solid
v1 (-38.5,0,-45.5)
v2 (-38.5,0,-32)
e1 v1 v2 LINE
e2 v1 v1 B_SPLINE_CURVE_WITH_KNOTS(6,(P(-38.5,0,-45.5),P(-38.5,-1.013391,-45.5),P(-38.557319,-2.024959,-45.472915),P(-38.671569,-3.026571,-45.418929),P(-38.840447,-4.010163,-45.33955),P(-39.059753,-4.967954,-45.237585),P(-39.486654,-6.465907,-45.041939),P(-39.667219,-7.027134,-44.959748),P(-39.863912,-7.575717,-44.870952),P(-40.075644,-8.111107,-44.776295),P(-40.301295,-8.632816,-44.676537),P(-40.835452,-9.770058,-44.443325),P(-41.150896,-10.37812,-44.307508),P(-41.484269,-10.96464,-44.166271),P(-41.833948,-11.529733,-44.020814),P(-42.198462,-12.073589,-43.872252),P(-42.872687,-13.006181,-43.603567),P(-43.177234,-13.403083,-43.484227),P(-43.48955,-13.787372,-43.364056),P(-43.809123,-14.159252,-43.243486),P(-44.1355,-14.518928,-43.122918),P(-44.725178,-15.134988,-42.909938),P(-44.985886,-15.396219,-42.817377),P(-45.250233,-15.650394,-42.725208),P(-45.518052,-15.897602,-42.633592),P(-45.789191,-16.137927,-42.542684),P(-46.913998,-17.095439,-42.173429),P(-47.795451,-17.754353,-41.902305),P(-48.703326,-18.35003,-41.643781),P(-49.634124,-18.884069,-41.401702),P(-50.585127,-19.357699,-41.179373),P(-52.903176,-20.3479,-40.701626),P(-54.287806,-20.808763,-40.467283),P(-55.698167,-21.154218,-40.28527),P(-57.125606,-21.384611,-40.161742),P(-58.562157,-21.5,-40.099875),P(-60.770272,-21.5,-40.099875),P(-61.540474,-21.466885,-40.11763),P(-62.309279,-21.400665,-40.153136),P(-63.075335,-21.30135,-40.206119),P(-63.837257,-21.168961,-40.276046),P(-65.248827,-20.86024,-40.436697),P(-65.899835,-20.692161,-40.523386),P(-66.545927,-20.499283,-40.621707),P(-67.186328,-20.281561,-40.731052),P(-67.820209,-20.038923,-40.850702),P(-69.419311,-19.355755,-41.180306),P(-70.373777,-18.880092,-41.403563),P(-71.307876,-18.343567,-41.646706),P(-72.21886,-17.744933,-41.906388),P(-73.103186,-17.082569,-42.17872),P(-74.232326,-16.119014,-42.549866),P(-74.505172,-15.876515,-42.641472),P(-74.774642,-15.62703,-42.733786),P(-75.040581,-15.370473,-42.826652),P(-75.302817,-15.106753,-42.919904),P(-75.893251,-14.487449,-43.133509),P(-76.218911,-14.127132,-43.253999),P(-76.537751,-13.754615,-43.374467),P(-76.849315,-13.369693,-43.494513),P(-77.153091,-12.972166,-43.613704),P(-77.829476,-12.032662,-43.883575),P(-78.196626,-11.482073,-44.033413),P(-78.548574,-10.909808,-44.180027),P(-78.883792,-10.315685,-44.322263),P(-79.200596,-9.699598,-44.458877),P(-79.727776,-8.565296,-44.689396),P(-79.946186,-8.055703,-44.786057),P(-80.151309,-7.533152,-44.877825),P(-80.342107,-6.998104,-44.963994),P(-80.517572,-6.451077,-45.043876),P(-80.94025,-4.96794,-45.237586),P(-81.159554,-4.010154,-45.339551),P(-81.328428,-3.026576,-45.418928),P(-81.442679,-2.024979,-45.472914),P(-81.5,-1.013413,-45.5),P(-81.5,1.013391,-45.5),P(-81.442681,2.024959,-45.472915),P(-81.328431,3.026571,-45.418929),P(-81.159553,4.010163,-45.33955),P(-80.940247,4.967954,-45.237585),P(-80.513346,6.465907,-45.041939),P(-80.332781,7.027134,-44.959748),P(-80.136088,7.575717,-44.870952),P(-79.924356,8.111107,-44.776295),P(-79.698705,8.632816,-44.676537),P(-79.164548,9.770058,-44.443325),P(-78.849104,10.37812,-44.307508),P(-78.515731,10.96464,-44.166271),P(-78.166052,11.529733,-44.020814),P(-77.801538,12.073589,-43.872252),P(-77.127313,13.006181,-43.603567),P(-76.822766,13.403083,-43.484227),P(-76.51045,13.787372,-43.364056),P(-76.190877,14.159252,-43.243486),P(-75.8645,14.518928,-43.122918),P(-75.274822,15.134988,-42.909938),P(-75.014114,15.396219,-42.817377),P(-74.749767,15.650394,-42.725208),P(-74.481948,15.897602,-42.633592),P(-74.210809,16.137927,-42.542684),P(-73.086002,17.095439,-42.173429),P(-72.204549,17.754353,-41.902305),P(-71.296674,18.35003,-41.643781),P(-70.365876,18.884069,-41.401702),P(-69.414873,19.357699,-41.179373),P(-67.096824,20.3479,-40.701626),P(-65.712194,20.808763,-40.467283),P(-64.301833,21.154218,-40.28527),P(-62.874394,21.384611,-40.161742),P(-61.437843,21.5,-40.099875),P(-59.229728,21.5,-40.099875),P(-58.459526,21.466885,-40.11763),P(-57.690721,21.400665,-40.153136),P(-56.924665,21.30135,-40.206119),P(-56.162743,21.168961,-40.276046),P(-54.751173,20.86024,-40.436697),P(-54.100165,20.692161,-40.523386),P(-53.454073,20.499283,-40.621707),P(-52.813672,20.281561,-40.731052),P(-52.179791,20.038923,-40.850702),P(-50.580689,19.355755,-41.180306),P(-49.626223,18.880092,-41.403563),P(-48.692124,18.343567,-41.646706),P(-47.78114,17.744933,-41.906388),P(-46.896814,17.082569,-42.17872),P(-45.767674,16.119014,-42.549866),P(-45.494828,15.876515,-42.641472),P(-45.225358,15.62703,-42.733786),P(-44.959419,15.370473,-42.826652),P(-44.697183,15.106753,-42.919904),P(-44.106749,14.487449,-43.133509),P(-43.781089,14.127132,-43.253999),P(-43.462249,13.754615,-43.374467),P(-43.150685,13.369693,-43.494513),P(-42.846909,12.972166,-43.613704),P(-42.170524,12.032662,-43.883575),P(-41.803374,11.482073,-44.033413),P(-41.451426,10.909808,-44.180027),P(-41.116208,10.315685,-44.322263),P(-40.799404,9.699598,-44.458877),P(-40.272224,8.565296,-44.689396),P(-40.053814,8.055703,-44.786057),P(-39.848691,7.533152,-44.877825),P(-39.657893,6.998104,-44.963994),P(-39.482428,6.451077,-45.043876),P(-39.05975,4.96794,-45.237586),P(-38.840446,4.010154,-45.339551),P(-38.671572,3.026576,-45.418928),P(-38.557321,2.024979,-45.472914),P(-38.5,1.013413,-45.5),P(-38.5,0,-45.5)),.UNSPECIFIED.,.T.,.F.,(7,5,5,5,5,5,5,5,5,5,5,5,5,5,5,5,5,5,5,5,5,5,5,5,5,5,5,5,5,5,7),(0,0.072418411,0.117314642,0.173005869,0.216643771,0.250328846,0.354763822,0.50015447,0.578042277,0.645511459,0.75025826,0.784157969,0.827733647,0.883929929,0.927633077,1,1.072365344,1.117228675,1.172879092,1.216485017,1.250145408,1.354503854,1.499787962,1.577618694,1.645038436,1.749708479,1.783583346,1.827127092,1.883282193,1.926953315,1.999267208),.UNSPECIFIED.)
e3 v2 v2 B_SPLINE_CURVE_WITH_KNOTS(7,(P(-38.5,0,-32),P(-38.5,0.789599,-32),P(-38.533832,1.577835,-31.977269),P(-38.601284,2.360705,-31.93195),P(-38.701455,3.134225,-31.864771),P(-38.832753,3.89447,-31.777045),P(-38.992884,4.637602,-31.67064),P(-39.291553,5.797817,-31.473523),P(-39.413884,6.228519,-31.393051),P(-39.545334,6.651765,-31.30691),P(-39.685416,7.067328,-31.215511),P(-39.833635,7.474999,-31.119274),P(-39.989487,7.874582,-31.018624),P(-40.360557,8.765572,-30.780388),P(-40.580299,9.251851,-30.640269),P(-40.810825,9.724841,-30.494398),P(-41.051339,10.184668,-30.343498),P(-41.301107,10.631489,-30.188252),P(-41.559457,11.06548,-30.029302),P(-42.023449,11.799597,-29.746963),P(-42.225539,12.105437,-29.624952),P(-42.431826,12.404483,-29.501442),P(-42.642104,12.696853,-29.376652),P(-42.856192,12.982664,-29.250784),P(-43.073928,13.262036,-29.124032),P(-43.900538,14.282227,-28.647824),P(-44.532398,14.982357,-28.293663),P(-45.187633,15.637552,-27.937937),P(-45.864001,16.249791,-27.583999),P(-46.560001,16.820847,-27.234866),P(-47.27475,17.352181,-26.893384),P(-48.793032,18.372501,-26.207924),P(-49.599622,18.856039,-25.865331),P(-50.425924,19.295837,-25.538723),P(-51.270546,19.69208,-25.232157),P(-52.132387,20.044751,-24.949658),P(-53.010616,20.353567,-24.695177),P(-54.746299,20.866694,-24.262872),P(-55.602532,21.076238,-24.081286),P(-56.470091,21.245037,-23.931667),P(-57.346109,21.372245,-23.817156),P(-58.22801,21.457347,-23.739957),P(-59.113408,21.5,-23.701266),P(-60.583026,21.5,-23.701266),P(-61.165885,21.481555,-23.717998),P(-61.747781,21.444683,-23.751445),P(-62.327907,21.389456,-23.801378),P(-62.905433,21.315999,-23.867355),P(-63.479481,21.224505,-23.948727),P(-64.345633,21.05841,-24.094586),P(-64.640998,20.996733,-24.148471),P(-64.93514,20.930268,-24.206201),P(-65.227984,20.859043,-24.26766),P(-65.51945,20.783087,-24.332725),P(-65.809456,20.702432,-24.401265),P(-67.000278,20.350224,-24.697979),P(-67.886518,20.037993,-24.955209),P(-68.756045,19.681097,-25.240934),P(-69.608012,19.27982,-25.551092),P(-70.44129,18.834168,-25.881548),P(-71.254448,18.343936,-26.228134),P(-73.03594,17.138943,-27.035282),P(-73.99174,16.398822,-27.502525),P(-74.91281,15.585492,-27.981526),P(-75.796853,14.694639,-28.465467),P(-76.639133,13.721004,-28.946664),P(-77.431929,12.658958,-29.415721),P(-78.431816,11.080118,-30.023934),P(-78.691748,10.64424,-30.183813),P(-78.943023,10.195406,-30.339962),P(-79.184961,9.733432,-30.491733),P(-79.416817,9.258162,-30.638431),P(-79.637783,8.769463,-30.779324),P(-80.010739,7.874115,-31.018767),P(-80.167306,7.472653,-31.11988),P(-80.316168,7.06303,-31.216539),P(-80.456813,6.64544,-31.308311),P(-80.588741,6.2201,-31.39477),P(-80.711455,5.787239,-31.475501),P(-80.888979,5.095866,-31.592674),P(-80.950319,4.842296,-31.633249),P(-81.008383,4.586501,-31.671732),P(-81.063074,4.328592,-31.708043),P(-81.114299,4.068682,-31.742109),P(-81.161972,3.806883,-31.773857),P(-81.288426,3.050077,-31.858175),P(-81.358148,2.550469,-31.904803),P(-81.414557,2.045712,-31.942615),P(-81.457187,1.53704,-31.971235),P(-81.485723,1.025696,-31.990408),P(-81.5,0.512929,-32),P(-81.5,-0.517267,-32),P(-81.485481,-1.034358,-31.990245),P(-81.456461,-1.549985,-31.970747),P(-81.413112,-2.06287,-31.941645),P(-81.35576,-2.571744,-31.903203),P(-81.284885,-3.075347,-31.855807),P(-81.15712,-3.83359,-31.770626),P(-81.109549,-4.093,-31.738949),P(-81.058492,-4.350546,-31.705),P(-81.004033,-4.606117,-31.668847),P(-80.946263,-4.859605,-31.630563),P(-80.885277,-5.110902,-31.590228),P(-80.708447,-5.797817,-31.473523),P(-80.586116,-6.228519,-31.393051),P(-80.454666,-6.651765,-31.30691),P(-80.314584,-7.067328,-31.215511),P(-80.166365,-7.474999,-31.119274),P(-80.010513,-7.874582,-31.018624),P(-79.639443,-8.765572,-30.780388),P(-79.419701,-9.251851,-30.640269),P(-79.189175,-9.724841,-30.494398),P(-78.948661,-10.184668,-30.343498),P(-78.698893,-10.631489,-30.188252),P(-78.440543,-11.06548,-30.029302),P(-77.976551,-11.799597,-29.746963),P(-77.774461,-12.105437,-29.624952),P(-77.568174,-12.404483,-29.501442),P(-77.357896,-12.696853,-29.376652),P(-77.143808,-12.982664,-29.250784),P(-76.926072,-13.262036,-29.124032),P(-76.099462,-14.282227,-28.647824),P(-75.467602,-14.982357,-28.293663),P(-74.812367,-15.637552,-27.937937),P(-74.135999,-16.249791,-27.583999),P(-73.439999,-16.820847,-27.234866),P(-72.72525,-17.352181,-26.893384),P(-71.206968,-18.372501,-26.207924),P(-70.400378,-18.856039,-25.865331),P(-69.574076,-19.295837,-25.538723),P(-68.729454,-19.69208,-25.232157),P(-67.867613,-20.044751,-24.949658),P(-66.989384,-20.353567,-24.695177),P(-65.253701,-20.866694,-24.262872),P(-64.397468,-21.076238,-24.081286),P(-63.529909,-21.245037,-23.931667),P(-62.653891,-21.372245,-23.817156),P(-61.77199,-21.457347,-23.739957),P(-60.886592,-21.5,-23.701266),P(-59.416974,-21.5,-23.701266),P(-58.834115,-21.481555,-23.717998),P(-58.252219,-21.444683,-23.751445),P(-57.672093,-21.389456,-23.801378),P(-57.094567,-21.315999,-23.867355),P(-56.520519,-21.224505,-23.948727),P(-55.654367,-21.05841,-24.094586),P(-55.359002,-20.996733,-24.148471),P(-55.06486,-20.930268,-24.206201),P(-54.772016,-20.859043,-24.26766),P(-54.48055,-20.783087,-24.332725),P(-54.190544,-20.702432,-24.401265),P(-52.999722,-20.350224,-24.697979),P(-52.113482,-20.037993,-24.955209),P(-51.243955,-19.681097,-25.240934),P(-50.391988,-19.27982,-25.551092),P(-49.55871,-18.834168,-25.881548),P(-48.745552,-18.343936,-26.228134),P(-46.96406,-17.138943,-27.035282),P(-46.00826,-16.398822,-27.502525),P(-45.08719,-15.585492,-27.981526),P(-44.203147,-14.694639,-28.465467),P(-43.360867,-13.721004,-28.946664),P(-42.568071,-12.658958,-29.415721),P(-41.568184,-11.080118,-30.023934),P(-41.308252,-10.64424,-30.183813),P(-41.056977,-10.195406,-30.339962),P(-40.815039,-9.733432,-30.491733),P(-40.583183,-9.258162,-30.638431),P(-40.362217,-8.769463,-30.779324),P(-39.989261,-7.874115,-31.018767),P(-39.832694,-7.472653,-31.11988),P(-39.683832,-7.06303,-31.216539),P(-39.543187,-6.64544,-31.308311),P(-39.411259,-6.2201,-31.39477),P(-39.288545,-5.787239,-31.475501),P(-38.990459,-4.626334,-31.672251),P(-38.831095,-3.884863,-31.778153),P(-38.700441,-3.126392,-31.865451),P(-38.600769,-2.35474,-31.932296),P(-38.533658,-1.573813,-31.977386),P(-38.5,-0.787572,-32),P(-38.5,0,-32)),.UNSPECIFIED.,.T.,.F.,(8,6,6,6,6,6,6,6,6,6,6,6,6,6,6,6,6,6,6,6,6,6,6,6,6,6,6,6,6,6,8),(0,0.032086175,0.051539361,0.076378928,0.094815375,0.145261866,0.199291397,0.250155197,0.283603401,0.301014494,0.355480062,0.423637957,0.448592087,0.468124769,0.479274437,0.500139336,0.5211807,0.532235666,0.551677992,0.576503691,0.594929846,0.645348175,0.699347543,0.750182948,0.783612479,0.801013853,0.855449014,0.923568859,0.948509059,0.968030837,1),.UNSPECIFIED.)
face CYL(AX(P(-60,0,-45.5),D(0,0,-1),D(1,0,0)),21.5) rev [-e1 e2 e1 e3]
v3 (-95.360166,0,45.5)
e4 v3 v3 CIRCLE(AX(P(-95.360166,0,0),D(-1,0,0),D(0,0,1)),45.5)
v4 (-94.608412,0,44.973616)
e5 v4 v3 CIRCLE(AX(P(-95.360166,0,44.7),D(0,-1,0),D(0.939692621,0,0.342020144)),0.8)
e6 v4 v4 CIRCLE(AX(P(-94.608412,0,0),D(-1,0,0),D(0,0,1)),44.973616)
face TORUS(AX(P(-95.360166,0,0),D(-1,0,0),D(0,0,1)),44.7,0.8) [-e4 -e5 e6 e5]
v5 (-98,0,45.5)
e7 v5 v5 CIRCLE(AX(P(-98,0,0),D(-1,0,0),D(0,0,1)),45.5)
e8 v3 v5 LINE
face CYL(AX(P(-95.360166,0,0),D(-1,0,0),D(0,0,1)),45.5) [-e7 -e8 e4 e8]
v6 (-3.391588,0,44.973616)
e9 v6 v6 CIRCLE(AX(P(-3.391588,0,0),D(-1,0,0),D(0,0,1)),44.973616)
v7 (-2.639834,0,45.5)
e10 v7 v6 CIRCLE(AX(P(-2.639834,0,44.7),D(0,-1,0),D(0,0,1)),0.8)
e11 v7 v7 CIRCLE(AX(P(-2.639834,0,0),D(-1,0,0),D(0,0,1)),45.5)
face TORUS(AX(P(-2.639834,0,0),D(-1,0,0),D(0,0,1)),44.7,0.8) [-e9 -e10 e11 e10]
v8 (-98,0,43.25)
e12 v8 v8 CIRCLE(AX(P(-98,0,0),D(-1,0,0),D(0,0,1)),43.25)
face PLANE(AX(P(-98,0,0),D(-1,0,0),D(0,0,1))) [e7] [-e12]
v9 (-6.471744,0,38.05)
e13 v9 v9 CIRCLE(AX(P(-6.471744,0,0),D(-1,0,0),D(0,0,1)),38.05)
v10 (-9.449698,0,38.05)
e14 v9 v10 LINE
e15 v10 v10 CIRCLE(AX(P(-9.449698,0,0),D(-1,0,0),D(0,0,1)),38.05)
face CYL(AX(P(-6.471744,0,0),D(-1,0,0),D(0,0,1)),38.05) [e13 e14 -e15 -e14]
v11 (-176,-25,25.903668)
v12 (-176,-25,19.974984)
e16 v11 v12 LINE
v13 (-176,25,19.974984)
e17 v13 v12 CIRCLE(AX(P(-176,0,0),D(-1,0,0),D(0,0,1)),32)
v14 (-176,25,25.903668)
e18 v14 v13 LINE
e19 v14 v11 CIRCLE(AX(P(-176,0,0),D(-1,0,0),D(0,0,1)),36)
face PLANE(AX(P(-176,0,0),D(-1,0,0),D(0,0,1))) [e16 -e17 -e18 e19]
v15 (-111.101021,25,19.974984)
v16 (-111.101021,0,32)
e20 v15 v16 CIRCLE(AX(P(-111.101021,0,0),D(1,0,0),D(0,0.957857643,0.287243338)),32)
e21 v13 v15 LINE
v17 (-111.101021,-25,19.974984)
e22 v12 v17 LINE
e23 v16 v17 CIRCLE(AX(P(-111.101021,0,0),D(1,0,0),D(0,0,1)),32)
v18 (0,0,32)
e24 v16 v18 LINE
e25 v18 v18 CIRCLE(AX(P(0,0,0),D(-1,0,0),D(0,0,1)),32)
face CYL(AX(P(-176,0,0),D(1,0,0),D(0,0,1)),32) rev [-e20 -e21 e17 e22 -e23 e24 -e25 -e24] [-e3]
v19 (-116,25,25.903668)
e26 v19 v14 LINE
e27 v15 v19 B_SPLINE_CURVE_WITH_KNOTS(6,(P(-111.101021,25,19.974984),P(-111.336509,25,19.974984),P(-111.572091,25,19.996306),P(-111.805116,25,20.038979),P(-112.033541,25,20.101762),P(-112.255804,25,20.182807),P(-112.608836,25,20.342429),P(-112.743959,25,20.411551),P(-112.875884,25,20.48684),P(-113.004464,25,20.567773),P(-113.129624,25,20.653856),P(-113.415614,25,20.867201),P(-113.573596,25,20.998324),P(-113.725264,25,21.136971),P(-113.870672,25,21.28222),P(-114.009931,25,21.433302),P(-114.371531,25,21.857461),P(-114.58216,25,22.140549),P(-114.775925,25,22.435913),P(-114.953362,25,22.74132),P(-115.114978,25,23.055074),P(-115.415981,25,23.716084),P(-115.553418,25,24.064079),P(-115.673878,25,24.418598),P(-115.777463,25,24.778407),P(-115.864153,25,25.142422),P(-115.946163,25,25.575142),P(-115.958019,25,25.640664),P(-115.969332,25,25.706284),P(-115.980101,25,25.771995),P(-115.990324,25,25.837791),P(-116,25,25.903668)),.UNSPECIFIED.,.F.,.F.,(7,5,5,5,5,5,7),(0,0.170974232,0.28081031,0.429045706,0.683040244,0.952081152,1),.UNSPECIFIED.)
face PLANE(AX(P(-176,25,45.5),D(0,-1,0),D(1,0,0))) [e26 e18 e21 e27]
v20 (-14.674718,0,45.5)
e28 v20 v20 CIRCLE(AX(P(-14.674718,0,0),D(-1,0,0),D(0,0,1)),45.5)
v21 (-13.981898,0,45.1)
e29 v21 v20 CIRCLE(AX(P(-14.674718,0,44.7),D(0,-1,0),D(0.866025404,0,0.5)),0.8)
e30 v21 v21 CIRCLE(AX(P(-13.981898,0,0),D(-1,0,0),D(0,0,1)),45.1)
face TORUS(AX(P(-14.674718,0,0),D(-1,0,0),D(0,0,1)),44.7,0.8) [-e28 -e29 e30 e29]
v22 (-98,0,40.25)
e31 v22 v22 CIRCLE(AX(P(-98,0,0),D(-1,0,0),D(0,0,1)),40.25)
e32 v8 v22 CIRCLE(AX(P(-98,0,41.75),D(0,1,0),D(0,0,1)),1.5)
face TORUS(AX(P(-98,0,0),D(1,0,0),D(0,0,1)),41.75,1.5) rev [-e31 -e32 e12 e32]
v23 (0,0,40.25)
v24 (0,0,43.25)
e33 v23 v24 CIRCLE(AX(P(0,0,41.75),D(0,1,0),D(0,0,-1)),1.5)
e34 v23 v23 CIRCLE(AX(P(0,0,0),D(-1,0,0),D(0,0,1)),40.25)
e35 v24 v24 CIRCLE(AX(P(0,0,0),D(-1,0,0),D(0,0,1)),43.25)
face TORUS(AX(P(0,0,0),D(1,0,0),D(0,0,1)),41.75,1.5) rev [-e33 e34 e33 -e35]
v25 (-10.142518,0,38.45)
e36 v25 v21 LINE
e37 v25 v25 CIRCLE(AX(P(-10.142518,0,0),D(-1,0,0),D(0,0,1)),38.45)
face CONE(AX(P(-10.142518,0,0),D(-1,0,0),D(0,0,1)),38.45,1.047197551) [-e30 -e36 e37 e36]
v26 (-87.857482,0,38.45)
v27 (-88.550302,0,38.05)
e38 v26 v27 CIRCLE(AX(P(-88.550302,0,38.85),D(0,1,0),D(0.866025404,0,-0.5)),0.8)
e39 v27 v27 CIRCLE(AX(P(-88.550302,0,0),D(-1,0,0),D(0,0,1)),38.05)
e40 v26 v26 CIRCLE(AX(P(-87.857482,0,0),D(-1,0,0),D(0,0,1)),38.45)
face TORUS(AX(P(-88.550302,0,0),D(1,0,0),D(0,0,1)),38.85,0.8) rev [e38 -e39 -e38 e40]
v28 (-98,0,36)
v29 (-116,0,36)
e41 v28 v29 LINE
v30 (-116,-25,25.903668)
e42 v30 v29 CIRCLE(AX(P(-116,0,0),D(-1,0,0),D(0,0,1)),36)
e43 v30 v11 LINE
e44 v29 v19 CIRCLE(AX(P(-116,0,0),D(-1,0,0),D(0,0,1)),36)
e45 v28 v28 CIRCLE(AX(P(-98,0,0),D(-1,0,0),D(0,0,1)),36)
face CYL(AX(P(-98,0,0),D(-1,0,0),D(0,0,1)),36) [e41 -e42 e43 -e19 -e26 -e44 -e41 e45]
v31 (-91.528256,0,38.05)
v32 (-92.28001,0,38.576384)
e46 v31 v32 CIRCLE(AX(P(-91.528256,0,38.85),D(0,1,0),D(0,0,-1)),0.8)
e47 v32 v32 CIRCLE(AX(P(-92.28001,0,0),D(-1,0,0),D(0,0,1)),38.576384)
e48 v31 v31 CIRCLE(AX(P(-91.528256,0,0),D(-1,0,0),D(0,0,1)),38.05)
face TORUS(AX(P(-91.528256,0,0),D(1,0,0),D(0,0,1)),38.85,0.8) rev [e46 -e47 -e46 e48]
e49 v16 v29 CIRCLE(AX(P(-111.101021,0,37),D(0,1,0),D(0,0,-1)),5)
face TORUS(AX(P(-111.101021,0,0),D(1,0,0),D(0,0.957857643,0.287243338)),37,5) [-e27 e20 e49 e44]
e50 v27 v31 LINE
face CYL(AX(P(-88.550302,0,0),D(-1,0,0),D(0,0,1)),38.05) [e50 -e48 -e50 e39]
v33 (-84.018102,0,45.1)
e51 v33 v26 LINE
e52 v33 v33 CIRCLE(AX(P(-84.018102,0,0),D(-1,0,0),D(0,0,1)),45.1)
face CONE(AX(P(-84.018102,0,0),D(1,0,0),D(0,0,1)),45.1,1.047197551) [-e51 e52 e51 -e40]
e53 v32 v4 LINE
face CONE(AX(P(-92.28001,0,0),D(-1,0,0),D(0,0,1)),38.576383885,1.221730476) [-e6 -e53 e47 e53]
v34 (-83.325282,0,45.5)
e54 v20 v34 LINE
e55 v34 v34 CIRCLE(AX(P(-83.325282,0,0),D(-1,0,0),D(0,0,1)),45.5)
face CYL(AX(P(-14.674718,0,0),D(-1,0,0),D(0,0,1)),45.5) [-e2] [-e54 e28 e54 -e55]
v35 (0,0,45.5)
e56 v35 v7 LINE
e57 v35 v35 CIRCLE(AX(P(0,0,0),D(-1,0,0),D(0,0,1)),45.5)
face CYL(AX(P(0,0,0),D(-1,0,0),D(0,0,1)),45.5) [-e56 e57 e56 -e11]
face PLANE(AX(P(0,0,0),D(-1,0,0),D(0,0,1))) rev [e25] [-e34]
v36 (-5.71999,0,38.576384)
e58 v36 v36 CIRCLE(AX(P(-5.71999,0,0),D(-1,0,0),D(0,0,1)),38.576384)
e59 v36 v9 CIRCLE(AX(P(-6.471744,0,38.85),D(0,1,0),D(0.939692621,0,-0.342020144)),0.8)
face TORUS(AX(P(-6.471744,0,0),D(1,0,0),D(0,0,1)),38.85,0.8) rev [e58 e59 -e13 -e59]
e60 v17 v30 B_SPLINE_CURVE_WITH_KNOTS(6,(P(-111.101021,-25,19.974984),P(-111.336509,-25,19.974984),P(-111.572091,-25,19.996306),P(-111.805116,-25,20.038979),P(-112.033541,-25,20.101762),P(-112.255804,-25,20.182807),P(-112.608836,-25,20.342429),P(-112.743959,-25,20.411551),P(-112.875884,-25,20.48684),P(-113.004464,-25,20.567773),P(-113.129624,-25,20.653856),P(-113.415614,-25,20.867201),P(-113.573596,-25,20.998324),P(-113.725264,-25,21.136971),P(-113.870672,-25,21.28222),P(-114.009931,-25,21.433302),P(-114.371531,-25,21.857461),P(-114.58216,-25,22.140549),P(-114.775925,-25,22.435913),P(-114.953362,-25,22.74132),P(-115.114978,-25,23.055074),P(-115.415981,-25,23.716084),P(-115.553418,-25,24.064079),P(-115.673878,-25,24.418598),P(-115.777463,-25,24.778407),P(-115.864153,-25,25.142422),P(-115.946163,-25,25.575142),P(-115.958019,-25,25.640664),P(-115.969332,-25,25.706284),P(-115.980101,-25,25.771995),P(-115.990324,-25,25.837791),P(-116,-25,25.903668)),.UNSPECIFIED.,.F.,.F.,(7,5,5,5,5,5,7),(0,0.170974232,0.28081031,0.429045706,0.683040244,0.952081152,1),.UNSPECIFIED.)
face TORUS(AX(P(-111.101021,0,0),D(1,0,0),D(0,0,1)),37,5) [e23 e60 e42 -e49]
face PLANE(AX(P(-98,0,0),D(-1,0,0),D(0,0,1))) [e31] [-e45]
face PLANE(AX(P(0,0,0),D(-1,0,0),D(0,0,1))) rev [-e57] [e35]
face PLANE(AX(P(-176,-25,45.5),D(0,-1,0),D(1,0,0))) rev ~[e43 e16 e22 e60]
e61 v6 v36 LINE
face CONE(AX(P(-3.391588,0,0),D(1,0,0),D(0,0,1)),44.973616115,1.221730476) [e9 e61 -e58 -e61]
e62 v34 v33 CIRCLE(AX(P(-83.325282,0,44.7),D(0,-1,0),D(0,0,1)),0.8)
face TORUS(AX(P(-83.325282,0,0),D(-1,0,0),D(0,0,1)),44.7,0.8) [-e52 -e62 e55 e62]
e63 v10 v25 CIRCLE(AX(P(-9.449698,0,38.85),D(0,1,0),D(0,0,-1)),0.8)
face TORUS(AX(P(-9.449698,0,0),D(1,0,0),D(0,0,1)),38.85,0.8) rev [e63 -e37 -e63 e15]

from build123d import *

# Parameters (mm, degrees)
F3_R        = 21.5
F4_DEPTH    = 25
F6_W        = 60
F6_H        = 50
F7_DEPTH    = 30
F8_T4_ANGLE = 73.3070095704
F8_T9_ANGLE = 73.3070095704


# Not quite as in the source:
# - a fillet or chamfer that OpenCascade refuses, or shapes differently, is made with other operations: its cross-section is extruded or revolved along the edge and cut away or added


with BuildPart() as f1:
    # F0 (on Front) → F1 (revolve)
    with BuildSketch(Plane.XZ):
        with BuildLine():
            Line((-176, 36), (-176, 32))
            Line((-176, 32), (0, 32))
            Line((0, 32), (0, 40.25))
            ThreePointArc((0, 40.25), (-1.5, 41.75), (0, 43.25))
            Line((0, 43.25), (0, 45.5))
            Line((0, 45.5), (-2.6398339694, 45.5))
            ThreePointArc((-2.6398339694, 45.5), (-3.0986951185, 45.3553216354), (-3.3915880661, 44.9736161147))
            Line((-3.3915880661, 44.9736161147), (-5.7199901792, 38.5763838853))
            ThreePointArc((-5.7199901792, 38.5763838853), (-6.0128831268, 38.1946783646), (-6.4717442759, 38.05))
            Line((-6.4717442759, 38.05), (-9.4496980299, 38.05))
            ThreePointArc((-9.4496980299, 38.05), (-9.8496980299, 38.157179677), (-10.142518353, 38.45))
            Line((-10.142518353, 38.45), (-13.9818976431, 45.1))
            ThreePointArc((-13.9818976431, 45.1), (-14.2747179661, 45.392820323), (-14.6747179661, 45.5))
            Line((-14.6747179661, 45.5), (-83.3252820339, 45.5))
            ThreePointArc((-83.3252820339, 45.5), (-83.7252820339, 45.392820323), (-84.0181023569, 45.1))
            Line((-84.0181023569, 45.1), (-87.857481647, 38.45))
            ThreePointArc((-87.857481647, 38.45), (-88.1503019701, 38.157179677), (-88.5503019701, 38.05))
            Line((-88.5503019701, 38.05), (-91.5282557241, 38.05))
            ThreePointArc((-91.5282557241, 38.05), (-91.9871168732, 38.1946783646), (-92.2800098208, 38.5763838853))
            Line((-92.2800098208, 38.5763838853), (-94.6084119339, 44.9736161147))
            ThreePointArc((-94.6084119339, 44.9736161147), (-94.9013048815, 45.3553216354), (-95.3601660306, 45.5))
            Line((-95.3601660306, 45.5), (-98, 45.5))
            Line((-98, 45.5), (-98, 43.25))
            ThreePointArc((-98, 43.25), (-96.5, 41.75), (-98, 40.25))
            Line((-98, 40.25), (-98, 36))
            Line((-98, 36), (-176, 36))
        make_face()
    revolve(axis=Axis((-38.3716828611, 0, 0), (-1, 0, 0)))

    # F3 (on offset) → F4 (cut)
    with BuildSketch(Plane.XY.offset(-45.5)):
        with Locations((-60, 0)):
            Circle(F3_R)
    extrude(amount=F4_DEPTH, mode=Mode.SUBTRACT)

    # F6 (on offset) → F7 (cut)
    with BuildSketch(Plane.XY.offset(45.5)):
        with Locations((-146, 0)):
            Rectangle(F6_W, F6_H)
    extrude(amount=-F7_DEPTH, mode=Mode.SUBTRACT)

    # F8: fillet of radius 5 on 2 edges, made by hand


with BuildPart() as f8_tool2:
    # F8_s3 → F8_t4 (revolve)
    with BuildSketch(Plane.XZ):
        with BuildLine():
            ThreePointArc((-111.1010205144, 32), (-114.2632981746, 33.1270166538), (-116, 36))
            Line((-116, 36), (-116, 32))
            Line((-116, 32), (-111.1010205144, 32))
        make_face()
    revolve(axis=Axis((-116, 0, 0), (1, 0, 0)), revolution_arc=F8_T4_ANGLE)

    split(bisect_by=Plane.XZ.offset(25), keep=Keep.BOTTOM)


with BuildPart() as f1_1:
    add(f1.part)

    # F8_t1: cut F8_tool2
    add(f8_tool2.part, mode=Mode.SUBTRACT)


with BuildPart() as f8_tool7:
    # F8_s8 → F8_t9 (revolve)
    with BuildSketch(Plane(origin=(0, 0, 0), x_dir=(1, 0, 0), z_dir=(0, 0.2872433376, -0.9578576434))):
        with BuildLine():
            ThreePointArc((-111.1010205144, -32), (-114.2632981746, -33.1270166538), (-116, -36))
            Line((-116, -36), (-116, -32))
            Line((-116, -32), (-111.1010205144, -32))
        make_face()
    revolve(axis=Axis((-116, 0, 0), (1, 0, 0)), revolution_arc=F8_T9_ANGLE)

    split(bisect_by=Plane.XZ.offset(-25), keep=Keep.TOP)


with BuildPart() as f1_2:
    add(f1_1.part)

    # F8_t6: cut F8_tool7
    add(f8_tool7.part, mode=Mode.SUBTRACT)


solid = f1_2.part
